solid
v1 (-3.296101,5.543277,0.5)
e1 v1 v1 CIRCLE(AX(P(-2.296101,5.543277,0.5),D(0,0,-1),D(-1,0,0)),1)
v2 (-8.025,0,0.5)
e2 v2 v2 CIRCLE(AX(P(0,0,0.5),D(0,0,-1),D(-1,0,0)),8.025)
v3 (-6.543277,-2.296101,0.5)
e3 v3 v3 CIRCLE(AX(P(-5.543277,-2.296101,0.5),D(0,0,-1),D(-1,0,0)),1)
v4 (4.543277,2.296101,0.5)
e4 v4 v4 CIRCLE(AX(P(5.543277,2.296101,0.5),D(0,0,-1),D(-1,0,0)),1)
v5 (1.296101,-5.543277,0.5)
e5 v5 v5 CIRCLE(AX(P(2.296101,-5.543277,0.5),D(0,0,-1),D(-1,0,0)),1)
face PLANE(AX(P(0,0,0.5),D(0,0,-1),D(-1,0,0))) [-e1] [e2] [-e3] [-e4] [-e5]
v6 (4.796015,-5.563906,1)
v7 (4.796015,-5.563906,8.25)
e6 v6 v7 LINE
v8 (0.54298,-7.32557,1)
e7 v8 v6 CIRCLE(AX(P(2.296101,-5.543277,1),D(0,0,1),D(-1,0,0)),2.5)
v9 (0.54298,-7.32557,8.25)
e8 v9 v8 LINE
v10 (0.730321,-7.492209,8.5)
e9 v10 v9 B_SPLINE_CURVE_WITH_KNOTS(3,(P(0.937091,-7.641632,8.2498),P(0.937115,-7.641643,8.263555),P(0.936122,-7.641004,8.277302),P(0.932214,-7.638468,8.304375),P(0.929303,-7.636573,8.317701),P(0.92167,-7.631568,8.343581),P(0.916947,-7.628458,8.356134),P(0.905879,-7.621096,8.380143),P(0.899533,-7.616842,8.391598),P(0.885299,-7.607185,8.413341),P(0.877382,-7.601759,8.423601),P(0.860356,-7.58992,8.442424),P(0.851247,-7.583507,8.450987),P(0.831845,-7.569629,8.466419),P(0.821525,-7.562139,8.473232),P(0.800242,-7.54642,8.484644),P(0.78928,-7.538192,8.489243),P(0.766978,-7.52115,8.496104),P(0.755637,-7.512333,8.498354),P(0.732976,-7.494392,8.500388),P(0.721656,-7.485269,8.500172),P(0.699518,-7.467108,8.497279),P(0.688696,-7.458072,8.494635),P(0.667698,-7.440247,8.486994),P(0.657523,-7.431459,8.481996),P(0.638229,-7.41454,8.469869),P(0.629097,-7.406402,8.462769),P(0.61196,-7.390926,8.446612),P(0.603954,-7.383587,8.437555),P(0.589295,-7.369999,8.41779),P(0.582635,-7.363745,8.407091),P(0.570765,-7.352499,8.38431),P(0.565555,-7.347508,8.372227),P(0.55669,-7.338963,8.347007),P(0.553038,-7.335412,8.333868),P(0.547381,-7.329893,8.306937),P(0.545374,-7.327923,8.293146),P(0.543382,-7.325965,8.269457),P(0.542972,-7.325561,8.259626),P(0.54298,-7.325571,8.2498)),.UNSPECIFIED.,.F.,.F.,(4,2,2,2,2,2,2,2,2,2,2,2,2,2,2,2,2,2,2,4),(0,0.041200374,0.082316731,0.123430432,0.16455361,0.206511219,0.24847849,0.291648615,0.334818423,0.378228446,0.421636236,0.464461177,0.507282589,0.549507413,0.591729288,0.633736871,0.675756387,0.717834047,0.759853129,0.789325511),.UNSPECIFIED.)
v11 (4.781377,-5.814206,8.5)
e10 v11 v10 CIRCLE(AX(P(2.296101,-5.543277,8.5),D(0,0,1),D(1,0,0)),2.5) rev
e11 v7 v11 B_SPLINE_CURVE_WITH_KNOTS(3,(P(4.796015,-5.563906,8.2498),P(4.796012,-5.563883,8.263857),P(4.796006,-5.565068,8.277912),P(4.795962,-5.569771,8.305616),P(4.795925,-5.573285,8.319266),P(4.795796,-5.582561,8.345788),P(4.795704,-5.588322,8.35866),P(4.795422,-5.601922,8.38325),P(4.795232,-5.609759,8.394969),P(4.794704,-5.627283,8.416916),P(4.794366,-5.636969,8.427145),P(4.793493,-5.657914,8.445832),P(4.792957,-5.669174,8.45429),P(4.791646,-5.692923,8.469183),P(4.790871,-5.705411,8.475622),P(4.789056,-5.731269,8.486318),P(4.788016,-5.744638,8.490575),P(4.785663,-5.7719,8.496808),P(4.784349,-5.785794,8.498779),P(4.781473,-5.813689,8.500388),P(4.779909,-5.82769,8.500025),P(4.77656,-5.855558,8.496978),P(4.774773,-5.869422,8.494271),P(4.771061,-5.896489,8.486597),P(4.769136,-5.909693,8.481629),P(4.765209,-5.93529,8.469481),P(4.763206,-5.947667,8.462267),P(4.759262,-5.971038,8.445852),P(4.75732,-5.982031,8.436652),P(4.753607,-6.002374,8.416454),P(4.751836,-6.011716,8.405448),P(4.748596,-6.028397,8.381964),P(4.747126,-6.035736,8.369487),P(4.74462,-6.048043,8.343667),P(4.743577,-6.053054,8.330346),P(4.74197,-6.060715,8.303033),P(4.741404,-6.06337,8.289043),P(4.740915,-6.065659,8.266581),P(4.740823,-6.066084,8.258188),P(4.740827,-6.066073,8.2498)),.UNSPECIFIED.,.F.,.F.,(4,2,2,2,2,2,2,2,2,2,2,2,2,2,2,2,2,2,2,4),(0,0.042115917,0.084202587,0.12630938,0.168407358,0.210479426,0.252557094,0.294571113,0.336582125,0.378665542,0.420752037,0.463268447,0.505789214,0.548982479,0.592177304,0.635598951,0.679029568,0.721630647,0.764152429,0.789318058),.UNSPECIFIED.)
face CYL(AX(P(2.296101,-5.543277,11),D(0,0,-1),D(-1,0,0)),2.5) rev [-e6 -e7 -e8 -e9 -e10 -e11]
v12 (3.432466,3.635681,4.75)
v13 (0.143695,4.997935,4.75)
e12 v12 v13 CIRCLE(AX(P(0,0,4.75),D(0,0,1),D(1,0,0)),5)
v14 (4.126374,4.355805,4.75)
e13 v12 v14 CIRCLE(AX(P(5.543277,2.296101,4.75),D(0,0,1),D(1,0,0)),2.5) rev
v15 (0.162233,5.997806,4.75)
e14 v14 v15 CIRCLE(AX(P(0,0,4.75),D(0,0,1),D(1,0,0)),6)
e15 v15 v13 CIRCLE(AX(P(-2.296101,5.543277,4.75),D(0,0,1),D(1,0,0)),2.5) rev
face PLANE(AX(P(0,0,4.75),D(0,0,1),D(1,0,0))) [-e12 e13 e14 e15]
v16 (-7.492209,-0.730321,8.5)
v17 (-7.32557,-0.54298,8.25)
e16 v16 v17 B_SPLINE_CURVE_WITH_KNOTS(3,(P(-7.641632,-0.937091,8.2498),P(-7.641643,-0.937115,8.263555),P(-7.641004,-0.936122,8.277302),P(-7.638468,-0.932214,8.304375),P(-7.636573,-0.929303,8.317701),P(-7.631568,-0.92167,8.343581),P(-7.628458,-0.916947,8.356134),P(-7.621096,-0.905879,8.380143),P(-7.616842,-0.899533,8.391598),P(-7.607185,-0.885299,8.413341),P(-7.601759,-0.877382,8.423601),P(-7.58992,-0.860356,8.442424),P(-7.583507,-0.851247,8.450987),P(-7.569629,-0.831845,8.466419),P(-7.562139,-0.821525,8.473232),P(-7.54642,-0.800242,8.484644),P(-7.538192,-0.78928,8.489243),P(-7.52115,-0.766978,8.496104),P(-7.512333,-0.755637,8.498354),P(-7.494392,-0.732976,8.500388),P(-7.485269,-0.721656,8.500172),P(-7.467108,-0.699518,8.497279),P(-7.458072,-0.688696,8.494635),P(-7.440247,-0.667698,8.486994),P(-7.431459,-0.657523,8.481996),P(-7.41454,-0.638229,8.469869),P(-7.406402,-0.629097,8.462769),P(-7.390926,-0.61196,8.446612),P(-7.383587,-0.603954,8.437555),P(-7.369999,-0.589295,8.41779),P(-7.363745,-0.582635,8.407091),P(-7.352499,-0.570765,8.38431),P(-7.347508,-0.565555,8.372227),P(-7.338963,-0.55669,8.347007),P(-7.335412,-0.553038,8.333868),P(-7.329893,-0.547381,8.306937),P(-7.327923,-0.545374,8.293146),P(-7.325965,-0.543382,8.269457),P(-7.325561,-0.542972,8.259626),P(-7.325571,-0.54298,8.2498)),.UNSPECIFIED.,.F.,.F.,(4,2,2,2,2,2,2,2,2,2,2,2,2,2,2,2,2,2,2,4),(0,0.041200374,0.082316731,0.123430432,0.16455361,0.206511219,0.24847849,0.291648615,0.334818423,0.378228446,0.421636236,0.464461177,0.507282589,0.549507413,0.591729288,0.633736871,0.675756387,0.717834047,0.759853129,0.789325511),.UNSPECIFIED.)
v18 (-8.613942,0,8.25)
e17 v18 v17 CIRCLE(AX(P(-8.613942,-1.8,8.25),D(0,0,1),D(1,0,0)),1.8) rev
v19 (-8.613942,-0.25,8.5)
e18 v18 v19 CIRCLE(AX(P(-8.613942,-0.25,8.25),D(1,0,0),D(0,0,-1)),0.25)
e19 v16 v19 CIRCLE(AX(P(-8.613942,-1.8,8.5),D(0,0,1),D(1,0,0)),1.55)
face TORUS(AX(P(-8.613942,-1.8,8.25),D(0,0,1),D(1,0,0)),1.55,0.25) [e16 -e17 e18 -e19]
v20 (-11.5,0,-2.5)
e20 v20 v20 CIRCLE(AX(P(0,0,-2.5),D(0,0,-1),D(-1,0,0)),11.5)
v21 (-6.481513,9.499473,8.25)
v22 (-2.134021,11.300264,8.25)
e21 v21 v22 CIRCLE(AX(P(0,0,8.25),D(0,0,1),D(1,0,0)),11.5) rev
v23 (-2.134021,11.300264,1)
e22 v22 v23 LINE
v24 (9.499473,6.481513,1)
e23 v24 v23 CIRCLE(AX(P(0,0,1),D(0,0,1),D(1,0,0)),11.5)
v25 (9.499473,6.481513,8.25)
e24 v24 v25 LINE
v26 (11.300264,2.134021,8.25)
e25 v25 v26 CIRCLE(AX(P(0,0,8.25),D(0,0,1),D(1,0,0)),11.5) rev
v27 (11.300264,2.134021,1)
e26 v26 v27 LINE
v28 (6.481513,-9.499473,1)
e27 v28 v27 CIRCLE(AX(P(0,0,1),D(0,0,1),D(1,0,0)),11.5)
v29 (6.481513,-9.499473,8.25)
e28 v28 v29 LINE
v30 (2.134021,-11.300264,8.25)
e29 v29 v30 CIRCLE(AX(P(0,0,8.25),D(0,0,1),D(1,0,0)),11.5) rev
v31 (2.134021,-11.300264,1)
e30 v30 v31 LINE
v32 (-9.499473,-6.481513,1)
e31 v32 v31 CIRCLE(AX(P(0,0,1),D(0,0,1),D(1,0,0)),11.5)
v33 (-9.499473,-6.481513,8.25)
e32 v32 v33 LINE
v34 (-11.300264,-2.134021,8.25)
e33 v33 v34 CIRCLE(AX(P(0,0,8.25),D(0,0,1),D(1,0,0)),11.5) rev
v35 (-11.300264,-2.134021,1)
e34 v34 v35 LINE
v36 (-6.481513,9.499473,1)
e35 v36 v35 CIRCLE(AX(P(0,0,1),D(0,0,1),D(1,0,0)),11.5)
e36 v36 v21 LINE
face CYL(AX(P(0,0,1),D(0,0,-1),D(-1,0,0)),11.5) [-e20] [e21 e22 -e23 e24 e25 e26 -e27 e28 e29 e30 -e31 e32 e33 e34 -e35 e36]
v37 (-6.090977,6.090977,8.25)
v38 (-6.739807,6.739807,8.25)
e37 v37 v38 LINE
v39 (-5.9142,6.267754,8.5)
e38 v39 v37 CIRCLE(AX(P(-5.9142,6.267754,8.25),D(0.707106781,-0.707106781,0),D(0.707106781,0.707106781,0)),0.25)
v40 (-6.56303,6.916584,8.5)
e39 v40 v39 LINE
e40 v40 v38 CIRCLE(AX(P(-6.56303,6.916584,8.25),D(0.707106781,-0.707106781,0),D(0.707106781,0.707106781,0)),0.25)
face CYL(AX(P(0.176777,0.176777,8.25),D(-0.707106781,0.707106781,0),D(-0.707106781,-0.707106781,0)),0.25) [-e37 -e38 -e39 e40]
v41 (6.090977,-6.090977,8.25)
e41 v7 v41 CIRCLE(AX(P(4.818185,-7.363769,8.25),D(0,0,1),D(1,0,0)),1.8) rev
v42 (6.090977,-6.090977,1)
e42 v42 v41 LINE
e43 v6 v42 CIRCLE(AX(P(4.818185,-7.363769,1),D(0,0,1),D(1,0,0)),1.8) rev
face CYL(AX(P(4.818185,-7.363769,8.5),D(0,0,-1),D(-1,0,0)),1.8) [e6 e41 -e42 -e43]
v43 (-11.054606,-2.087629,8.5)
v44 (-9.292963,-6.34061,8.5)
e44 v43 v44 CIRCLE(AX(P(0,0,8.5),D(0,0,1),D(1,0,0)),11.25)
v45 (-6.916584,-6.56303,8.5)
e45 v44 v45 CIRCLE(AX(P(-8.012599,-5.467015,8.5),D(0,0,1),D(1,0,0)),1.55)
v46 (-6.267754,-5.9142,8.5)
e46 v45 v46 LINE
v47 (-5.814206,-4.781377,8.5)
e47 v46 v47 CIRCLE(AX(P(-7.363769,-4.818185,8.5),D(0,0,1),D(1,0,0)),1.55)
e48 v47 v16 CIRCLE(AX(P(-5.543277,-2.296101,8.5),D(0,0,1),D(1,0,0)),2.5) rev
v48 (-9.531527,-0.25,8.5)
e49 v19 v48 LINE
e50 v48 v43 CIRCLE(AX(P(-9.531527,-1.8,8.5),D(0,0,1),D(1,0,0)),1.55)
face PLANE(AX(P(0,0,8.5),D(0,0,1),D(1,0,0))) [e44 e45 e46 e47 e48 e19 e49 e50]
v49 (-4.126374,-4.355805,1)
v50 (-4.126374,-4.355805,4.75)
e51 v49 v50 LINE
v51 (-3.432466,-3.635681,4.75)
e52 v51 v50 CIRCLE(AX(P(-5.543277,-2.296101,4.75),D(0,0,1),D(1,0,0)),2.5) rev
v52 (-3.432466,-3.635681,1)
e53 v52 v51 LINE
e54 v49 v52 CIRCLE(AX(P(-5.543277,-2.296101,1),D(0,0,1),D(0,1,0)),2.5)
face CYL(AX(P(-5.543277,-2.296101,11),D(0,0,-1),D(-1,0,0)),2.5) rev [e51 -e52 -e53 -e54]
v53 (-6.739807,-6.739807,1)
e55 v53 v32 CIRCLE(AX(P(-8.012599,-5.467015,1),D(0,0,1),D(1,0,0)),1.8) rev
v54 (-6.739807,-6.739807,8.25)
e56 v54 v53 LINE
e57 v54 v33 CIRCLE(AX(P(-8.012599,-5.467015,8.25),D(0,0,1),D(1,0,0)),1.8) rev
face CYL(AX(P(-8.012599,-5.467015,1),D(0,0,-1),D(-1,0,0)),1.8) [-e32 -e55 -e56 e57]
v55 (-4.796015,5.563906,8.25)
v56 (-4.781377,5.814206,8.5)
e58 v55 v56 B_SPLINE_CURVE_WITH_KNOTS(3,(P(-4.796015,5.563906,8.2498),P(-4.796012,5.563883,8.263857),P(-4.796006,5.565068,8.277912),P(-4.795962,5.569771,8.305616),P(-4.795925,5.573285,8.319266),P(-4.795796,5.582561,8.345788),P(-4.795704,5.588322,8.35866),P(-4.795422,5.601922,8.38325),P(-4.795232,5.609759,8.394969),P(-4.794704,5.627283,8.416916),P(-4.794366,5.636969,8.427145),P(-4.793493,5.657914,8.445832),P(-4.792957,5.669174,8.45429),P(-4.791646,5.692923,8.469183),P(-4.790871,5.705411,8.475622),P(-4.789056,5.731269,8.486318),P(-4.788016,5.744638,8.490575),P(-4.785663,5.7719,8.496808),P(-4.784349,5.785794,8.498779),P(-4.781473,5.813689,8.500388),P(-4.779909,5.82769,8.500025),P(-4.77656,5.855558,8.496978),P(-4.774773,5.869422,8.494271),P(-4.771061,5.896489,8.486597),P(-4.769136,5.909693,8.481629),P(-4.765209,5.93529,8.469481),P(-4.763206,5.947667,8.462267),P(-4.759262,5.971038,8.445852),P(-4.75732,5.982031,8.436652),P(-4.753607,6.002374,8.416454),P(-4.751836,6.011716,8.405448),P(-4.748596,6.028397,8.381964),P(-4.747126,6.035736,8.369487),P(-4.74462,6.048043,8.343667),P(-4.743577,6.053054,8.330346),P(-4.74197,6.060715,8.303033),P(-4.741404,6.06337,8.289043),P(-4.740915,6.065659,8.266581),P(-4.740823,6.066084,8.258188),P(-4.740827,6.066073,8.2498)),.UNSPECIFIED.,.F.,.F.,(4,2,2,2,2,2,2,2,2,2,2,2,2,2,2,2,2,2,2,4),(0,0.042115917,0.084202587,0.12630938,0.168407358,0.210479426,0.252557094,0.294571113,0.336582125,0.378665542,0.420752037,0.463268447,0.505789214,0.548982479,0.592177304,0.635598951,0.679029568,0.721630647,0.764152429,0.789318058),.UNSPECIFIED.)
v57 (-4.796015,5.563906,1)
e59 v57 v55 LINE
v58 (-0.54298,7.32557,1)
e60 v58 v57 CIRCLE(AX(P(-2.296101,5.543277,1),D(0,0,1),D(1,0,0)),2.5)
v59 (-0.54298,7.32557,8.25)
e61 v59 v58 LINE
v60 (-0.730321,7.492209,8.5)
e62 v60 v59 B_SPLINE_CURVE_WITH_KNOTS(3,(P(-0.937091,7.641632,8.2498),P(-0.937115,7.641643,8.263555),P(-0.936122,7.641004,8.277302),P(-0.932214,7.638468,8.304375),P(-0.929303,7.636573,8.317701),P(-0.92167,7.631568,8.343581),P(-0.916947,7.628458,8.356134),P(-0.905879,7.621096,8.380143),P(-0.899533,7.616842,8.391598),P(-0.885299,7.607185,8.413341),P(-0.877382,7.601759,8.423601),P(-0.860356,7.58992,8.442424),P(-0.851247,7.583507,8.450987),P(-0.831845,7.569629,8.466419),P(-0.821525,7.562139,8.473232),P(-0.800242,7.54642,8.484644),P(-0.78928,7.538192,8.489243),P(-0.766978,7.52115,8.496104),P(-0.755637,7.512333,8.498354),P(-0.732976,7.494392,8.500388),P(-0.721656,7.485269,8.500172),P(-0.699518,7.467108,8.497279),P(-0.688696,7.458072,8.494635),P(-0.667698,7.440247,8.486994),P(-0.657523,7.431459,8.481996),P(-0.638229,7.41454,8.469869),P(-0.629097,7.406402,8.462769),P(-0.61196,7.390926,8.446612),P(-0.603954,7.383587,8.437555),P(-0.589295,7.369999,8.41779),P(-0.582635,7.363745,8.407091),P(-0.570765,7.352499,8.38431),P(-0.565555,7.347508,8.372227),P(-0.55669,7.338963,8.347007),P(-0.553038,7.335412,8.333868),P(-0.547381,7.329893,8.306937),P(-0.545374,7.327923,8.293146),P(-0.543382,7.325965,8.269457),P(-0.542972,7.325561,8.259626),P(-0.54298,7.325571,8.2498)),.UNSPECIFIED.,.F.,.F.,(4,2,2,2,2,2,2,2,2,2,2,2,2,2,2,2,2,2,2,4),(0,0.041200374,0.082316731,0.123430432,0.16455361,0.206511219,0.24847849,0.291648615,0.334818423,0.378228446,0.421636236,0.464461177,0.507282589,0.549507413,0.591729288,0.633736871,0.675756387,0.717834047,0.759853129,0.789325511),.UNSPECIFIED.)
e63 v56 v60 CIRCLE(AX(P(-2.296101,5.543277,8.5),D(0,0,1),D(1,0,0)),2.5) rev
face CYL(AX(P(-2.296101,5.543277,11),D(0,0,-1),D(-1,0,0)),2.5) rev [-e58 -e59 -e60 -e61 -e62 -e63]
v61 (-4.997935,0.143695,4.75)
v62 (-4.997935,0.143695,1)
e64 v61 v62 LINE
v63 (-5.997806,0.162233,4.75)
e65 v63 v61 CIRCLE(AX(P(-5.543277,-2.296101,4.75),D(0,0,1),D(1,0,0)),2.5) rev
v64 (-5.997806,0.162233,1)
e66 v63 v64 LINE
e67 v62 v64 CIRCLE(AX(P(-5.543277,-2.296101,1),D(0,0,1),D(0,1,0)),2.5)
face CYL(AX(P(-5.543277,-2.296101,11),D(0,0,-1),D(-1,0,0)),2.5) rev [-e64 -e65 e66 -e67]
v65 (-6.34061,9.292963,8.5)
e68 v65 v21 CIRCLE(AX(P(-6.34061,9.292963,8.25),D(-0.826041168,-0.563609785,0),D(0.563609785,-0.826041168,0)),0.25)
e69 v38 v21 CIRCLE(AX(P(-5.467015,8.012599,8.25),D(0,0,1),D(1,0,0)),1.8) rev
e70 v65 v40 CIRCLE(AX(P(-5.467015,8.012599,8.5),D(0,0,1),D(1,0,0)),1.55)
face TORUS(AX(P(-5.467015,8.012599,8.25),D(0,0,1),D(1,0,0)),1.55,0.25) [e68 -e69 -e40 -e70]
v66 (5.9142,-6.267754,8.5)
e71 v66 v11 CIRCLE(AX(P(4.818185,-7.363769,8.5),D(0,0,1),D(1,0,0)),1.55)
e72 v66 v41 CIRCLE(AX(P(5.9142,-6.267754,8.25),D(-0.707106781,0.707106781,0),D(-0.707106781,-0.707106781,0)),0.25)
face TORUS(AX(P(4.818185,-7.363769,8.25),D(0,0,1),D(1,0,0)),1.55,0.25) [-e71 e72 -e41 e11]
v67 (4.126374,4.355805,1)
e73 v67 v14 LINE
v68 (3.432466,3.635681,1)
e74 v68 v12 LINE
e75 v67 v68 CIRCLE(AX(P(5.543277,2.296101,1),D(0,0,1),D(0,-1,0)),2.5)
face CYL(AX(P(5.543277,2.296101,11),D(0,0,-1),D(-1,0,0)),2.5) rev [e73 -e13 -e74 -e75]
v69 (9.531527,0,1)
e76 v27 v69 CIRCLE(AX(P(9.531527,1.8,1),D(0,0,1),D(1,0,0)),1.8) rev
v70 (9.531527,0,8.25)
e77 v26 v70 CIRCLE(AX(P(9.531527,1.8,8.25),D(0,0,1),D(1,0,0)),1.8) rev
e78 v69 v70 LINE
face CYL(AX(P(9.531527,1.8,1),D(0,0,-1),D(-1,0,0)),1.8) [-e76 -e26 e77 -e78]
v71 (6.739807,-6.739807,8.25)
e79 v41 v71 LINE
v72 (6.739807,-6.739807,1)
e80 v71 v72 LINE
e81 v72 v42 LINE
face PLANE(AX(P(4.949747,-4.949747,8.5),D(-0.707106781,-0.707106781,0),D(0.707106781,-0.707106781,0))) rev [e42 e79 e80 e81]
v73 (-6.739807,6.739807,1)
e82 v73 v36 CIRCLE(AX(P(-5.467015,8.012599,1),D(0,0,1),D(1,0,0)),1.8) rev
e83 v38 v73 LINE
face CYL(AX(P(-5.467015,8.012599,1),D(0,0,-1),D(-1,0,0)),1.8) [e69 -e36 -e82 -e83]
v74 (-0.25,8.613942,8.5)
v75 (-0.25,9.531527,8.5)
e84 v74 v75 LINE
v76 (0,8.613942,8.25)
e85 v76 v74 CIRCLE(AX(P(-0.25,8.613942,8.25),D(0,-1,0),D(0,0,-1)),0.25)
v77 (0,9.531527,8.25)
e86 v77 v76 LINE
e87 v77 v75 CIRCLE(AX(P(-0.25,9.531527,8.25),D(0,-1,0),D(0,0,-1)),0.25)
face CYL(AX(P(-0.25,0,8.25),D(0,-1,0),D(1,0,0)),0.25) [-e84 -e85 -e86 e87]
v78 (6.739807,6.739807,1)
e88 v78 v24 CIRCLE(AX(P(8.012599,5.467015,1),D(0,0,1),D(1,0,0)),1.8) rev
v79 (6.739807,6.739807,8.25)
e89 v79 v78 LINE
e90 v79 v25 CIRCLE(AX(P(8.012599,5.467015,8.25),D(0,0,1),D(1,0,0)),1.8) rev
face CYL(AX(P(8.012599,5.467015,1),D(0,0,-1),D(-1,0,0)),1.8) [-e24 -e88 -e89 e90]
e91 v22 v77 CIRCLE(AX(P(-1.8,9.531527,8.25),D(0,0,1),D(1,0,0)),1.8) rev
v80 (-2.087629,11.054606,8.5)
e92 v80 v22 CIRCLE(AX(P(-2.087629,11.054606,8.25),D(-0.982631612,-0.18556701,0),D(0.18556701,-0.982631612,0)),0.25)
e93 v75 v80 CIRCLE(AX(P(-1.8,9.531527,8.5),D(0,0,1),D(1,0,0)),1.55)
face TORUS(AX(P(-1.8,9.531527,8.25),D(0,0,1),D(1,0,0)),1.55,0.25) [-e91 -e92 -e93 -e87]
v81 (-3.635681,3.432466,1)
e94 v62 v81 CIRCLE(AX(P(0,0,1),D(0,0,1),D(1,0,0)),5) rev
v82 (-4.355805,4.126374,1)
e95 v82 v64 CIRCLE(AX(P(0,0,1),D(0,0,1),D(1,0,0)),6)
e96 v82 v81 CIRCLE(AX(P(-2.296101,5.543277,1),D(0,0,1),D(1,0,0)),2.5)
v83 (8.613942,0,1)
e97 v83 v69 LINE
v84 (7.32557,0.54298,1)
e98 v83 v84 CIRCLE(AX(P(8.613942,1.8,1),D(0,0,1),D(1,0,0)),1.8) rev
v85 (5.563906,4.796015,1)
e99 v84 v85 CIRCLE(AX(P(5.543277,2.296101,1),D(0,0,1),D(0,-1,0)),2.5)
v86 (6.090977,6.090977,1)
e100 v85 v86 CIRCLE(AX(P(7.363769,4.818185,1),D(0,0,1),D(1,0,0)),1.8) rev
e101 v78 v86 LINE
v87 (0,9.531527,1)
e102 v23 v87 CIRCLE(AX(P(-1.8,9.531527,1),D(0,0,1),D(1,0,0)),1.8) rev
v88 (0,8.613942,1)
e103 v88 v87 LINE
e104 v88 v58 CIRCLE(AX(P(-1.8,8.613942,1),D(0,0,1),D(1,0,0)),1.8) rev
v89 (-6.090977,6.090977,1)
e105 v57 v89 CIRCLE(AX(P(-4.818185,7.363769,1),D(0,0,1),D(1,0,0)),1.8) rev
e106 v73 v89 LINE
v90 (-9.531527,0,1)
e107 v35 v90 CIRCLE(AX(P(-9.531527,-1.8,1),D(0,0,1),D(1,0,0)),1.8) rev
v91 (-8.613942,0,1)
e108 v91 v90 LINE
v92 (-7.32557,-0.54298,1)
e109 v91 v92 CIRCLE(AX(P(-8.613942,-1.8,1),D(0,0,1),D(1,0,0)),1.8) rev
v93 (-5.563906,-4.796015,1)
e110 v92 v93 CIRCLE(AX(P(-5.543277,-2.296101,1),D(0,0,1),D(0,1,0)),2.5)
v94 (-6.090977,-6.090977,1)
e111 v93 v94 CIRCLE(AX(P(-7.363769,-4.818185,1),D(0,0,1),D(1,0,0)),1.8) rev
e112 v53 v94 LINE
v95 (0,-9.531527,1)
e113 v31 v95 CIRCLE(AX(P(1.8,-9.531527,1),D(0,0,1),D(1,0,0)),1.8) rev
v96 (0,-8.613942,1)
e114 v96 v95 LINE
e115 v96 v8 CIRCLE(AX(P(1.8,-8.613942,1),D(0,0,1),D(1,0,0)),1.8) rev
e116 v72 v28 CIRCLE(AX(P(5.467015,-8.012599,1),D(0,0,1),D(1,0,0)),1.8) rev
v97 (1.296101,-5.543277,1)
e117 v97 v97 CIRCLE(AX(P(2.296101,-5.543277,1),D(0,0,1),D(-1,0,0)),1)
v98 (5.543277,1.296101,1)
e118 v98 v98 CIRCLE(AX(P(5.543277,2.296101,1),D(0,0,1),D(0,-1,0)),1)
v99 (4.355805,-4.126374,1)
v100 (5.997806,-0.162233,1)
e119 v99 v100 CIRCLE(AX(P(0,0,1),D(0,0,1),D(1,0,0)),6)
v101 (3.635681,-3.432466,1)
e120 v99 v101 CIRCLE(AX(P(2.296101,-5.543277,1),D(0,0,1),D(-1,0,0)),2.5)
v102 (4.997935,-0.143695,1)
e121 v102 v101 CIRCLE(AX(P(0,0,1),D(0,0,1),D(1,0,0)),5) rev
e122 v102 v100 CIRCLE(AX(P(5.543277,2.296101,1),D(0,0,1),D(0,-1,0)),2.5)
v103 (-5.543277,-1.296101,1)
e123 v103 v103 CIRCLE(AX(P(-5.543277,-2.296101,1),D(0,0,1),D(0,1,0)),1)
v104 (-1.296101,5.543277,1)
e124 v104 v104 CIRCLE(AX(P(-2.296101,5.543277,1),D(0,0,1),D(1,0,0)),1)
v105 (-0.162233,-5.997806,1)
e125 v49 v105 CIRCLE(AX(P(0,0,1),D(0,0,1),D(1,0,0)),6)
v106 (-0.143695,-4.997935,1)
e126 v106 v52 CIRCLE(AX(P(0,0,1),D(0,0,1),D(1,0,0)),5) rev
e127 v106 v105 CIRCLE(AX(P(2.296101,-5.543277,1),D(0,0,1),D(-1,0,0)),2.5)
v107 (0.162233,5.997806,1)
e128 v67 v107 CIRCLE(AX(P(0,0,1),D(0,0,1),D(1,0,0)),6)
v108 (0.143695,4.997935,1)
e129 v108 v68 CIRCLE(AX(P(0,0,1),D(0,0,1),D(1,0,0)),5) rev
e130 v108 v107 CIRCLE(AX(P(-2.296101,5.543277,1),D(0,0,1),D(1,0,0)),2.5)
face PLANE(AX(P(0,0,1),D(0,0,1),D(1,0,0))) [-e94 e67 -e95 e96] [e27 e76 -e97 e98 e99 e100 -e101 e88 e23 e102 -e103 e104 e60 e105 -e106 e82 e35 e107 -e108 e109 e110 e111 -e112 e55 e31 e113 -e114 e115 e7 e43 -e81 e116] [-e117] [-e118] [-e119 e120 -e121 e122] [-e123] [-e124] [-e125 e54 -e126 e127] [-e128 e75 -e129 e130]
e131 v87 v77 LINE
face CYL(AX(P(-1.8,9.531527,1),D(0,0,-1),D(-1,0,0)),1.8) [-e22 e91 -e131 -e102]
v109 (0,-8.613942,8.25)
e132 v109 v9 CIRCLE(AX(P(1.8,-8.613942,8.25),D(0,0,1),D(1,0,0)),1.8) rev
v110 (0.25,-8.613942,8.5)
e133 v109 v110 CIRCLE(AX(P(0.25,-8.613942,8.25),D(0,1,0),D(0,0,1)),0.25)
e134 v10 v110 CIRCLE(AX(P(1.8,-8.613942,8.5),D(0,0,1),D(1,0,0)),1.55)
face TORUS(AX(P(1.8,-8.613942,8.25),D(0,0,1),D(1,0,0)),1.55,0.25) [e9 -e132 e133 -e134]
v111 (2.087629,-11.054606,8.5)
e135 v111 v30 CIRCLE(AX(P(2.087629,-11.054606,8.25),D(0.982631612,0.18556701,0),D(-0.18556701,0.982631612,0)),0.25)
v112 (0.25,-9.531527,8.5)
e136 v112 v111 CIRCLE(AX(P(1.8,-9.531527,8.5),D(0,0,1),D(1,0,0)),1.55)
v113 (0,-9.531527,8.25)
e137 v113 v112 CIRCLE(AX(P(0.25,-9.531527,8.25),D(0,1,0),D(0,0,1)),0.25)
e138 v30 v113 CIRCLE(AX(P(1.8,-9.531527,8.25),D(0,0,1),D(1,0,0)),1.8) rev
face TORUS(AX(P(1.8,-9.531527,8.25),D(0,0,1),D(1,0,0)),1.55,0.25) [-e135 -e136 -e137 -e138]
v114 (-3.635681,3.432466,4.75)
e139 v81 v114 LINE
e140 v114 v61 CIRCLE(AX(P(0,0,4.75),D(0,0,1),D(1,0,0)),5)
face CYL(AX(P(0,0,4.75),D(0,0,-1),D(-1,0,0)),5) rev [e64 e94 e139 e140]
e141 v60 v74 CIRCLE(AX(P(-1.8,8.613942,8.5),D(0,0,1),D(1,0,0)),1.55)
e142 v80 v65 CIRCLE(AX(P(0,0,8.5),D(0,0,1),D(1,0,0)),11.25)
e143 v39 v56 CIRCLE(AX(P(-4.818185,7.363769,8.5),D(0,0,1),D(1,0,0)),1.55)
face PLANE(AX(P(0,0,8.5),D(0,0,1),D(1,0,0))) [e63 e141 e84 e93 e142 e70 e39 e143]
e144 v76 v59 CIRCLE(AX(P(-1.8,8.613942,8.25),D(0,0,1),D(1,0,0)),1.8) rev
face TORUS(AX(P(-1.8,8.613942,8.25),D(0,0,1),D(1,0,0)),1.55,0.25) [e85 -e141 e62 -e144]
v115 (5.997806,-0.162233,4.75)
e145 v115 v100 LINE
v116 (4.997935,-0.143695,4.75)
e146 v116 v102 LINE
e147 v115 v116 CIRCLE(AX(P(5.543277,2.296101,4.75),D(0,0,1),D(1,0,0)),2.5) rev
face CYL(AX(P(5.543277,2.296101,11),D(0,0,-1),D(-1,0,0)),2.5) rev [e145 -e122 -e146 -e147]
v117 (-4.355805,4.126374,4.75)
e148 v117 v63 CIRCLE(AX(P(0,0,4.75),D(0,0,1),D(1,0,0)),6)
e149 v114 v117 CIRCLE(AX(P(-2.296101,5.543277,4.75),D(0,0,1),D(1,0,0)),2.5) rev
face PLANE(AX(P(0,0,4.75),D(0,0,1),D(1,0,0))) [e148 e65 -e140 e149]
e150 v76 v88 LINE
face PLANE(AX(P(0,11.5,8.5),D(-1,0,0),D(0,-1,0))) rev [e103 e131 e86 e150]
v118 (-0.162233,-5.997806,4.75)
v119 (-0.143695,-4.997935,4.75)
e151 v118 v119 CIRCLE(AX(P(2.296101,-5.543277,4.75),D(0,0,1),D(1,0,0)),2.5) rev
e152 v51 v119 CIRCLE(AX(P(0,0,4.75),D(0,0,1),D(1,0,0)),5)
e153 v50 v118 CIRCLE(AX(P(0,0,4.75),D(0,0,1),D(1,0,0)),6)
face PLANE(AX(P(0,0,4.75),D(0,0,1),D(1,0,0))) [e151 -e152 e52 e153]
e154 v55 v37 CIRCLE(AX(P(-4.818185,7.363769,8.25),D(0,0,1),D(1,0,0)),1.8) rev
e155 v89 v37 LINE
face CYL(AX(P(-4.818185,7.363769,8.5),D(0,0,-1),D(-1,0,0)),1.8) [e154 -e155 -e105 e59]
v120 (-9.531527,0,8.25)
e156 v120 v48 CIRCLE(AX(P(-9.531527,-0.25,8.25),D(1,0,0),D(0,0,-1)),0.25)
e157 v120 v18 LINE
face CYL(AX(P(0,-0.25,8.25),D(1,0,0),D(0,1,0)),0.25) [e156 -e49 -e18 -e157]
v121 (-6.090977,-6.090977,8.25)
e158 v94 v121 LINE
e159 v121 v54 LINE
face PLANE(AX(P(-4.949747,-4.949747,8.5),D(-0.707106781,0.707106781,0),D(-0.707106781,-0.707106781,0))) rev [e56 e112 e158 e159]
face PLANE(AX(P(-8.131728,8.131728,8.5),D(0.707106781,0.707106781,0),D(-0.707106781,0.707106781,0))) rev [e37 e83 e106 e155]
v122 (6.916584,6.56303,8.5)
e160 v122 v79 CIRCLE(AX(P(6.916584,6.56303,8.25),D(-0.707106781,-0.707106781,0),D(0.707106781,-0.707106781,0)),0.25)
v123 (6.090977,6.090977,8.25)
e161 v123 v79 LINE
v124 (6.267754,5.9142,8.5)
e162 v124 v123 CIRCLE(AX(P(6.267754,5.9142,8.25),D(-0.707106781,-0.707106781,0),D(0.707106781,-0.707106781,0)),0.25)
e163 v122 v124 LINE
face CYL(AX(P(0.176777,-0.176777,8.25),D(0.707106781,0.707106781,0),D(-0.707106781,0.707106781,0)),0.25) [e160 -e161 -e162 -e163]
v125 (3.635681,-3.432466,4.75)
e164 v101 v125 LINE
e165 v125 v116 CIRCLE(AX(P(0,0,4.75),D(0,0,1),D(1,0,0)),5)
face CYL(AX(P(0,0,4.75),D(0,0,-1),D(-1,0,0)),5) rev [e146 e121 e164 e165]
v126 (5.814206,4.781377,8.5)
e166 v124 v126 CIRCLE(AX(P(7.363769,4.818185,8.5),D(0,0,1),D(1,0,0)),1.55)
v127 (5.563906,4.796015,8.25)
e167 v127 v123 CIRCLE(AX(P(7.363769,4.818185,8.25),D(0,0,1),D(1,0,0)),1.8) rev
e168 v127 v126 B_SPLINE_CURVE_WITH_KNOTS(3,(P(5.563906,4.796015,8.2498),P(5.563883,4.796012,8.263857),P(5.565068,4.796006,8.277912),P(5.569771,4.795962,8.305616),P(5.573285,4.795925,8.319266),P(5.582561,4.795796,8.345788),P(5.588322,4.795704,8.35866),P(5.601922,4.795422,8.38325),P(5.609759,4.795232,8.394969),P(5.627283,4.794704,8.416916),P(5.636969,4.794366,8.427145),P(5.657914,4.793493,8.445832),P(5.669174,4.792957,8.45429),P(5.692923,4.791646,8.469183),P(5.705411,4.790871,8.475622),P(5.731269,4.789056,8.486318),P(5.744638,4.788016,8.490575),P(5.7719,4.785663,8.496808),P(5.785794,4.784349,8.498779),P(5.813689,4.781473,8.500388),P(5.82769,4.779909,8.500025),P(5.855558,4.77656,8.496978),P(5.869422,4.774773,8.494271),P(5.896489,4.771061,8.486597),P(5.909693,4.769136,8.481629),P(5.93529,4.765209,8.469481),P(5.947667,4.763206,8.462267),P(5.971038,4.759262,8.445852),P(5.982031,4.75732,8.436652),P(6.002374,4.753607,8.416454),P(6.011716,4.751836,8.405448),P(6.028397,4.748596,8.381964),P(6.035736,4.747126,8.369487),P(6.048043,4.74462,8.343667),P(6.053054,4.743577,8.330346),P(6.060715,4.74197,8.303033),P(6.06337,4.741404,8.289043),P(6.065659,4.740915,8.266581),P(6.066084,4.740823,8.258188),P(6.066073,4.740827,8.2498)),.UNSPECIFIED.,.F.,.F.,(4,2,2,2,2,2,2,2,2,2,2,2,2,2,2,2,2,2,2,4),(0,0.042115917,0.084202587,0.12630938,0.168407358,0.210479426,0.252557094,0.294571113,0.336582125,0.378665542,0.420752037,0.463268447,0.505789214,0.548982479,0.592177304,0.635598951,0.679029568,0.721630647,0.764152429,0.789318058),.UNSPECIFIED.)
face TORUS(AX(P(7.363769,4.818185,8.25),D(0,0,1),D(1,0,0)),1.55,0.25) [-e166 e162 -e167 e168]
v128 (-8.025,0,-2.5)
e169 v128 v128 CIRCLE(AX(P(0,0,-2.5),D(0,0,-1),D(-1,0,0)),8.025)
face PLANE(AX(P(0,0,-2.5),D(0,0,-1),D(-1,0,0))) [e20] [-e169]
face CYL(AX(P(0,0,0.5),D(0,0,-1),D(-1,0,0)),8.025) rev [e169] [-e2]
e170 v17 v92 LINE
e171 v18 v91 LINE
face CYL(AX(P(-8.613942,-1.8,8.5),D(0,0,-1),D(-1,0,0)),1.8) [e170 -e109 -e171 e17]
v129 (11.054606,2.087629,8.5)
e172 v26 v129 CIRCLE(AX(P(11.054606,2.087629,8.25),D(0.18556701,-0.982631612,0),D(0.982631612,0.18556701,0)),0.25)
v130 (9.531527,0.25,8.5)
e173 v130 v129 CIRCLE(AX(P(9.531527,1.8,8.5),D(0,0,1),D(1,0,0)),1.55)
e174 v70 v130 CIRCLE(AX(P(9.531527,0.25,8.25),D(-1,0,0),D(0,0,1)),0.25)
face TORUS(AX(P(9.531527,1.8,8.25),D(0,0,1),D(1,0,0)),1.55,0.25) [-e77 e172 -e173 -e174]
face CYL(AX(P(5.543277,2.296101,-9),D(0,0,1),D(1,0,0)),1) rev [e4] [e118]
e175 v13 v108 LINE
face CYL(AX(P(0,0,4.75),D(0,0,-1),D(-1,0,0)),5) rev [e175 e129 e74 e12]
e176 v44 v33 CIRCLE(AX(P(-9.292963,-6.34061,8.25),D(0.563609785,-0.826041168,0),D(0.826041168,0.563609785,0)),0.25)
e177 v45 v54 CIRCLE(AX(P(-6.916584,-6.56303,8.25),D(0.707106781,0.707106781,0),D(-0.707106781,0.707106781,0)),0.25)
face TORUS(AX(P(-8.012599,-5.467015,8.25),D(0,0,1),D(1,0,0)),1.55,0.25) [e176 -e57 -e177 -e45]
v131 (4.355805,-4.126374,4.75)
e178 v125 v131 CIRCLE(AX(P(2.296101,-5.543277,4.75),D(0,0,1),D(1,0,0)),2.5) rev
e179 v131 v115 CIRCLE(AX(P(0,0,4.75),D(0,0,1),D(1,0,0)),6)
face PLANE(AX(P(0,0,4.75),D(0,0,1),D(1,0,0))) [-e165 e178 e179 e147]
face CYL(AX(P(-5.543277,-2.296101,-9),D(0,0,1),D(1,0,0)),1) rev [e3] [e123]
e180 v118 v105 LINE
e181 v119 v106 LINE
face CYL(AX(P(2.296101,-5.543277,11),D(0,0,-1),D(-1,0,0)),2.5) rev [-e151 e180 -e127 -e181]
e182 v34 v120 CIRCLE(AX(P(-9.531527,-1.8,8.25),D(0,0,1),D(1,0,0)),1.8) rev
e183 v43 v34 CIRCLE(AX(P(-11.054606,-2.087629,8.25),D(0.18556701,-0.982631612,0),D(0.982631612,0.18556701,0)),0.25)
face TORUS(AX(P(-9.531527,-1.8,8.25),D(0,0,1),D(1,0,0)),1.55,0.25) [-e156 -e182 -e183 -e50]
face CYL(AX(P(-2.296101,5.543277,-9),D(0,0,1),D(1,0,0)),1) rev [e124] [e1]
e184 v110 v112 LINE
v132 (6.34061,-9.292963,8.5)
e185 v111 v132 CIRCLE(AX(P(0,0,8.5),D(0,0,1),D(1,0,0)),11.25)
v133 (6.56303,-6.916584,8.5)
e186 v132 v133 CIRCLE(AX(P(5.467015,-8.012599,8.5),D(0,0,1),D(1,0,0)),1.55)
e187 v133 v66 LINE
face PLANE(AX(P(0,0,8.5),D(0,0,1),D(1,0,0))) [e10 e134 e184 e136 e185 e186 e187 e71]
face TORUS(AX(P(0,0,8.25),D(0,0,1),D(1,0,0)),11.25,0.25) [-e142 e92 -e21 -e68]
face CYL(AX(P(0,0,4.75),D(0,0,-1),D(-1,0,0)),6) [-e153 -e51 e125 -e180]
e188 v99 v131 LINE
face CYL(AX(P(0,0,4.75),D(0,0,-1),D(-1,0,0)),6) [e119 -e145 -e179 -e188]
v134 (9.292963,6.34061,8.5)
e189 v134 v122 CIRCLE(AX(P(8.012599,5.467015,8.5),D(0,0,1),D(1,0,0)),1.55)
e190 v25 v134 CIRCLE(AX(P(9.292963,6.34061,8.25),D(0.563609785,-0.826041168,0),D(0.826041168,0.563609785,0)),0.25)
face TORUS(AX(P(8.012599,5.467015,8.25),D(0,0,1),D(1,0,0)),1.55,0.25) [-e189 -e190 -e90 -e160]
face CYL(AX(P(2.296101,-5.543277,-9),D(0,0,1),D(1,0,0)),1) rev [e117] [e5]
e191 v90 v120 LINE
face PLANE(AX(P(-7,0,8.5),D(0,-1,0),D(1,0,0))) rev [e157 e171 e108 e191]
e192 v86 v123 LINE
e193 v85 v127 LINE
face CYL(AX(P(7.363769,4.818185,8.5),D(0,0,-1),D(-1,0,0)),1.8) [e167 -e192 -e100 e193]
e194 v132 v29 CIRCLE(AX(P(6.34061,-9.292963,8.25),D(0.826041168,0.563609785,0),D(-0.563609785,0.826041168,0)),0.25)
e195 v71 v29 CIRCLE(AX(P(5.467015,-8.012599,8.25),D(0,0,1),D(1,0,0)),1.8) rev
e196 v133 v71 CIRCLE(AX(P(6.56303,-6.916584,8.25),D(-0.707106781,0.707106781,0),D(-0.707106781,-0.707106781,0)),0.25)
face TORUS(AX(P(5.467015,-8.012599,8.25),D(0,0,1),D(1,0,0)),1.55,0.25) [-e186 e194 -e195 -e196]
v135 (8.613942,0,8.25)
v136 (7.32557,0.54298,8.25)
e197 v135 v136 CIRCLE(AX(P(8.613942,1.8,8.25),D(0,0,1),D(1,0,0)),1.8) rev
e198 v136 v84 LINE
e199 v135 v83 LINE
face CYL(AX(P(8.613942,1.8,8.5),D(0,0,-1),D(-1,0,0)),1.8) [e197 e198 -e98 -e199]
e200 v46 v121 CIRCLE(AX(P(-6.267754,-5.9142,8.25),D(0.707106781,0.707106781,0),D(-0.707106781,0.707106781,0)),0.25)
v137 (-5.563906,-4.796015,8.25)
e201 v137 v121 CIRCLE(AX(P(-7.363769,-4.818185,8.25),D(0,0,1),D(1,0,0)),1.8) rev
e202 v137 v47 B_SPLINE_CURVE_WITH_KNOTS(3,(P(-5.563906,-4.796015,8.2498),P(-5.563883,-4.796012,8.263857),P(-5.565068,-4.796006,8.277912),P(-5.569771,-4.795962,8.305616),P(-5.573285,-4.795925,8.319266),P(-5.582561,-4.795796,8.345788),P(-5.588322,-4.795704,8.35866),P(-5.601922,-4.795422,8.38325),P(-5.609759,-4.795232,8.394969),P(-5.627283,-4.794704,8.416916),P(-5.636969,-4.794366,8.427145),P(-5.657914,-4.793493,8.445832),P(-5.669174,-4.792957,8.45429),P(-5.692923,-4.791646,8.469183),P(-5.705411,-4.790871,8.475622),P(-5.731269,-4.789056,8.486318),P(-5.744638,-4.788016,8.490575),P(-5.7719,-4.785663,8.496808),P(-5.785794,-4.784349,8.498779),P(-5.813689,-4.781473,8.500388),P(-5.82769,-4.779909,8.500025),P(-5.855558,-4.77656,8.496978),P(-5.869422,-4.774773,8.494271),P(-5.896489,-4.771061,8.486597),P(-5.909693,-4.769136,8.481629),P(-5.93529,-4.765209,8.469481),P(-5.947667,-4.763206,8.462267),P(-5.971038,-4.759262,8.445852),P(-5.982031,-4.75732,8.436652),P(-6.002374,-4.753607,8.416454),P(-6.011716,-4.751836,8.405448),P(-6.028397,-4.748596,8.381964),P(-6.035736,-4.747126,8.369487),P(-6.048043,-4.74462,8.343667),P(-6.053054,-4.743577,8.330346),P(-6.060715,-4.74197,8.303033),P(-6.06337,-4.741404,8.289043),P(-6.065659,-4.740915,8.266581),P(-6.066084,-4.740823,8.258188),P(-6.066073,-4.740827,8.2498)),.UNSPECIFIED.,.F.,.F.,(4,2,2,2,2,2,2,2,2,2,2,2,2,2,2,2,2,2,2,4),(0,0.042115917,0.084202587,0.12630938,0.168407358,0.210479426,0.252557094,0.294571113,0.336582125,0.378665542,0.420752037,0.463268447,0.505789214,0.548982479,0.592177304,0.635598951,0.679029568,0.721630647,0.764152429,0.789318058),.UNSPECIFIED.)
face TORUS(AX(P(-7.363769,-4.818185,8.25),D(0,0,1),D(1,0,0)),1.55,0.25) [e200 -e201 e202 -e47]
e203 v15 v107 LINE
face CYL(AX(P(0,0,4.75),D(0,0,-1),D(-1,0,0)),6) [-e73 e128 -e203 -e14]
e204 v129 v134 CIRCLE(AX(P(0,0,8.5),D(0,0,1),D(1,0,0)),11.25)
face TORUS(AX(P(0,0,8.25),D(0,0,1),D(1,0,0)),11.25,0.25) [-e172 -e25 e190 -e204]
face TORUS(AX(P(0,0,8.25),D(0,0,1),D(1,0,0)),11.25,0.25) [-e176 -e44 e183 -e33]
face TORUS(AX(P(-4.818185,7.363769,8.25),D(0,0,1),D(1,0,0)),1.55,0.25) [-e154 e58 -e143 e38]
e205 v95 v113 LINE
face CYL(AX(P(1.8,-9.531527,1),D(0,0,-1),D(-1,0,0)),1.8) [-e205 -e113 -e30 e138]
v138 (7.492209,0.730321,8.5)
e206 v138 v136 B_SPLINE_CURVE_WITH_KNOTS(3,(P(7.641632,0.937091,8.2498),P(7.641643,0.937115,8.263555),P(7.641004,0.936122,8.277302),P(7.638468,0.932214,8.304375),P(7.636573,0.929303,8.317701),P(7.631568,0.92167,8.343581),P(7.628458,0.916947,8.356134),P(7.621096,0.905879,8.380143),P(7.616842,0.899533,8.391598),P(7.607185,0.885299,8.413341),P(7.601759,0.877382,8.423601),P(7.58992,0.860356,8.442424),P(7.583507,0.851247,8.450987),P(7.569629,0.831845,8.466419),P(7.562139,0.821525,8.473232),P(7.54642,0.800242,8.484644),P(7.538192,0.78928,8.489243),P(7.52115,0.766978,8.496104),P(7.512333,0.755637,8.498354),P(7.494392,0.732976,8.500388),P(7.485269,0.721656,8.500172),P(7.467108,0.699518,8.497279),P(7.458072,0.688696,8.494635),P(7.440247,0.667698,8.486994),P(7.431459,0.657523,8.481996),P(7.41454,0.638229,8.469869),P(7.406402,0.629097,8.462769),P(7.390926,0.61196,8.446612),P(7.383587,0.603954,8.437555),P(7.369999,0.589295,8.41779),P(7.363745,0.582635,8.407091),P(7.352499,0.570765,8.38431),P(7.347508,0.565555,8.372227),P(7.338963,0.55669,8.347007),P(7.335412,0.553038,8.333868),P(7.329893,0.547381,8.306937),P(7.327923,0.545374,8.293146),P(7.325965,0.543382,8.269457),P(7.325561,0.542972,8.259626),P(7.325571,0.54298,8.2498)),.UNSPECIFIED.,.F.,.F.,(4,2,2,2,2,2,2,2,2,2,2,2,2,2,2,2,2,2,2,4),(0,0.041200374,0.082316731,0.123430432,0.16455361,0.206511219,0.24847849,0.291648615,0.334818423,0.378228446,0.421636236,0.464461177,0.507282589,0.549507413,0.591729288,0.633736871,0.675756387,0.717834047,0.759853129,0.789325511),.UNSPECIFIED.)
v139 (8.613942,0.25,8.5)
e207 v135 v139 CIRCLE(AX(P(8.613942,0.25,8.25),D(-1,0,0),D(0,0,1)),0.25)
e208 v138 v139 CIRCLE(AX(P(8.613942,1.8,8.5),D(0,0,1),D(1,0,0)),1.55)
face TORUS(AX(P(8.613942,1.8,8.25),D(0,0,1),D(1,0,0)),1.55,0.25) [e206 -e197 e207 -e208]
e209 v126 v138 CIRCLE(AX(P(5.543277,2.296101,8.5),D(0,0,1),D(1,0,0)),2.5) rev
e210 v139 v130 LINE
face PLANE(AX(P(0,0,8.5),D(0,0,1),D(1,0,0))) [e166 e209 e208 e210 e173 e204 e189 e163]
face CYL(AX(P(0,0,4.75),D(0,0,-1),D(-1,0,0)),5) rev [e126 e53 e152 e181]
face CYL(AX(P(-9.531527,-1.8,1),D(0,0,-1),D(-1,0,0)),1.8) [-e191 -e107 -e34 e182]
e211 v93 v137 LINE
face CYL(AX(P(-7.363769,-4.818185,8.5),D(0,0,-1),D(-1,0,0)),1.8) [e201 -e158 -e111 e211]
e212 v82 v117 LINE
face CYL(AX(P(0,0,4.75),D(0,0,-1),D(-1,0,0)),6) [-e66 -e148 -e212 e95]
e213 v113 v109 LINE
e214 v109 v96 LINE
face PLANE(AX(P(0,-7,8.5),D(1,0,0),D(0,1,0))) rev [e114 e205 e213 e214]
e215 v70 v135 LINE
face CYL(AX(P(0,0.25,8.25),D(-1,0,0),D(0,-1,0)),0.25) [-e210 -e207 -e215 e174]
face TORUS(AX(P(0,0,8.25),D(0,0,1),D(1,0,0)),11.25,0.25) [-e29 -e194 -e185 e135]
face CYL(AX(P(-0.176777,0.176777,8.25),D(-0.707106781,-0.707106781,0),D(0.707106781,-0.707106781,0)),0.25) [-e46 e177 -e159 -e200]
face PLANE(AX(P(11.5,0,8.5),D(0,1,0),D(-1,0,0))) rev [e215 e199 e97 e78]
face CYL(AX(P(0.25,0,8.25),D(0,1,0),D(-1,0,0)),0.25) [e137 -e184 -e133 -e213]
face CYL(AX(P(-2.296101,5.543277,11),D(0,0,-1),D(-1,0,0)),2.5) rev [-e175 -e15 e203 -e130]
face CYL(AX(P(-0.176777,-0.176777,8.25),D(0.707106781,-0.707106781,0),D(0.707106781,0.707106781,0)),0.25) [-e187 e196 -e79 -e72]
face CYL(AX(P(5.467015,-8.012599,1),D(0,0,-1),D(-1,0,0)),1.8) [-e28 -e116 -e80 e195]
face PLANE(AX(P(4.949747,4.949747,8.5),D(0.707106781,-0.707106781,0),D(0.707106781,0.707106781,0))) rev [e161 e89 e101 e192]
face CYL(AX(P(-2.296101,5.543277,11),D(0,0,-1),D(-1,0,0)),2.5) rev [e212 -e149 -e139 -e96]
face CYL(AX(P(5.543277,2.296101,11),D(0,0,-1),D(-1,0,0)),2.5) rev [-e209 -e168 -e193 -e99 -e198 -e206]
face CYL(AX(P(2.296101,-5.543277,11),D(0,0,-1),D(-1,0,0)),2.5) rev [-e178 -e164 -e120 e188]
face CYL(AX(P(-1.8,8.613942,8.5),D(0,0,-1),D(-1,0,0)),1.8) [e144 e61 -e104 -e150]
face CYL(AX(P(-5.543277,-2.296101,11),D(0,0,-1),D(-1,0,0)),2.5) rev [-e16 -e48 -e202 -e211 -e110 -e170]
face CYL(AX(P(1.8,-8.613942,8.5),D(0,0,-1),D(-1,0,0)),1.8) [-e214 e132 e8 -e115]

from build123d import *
from build123d.topology import SkipClean

# Parameters (mm, degrees)
SKETCH1_R           = 11.5
BOSS_EXTRUDE1_DEPTH = 1
BOSS_EXTRUDE2_DEPTH = 7.5
BOSS_EXTRUDE4_START = 2.5
SKETCH9_R           = 11.5
BOSS_EXTRUDE4_DEPTH = 2.5
FILLET7_R           = 1.8
SKETCH15_R          = 8.025
CUT_EXTRUDE7_DEPTH  = 3
SKETCH17_R          = 6
SKETCH17_R_2        = 5
BOSS_EXTRUDE7_DEPTH = 3.75
FILLET8_R           = 0.25
SKETCH21_R          = 2.5000000000000004
CUT_EXTRUDE9_DEPTH  = 10
SKETCH22_R          = 1.0000000000000002
CUT_EXTRUDE10_DEPTH = 10
CIRPATTERN5_COUNT   = 4
CIRPATTERN6_COUNT   = 4


with BuildPart() as part:
    # Sketch1 → Boss-Extrude1 (new body)
    with BuildSketch(Plane.XY):
        Circle(SKETCH1_R)
    extrude(amount=BOSS_EXTRUDE1_DEPTH)

    # Sketch3 → Boss-Extrude2 (add)
    with SkipClean():  # the faces are left unmerged after this step: merging them gives an invalid solid
        with BuildSketch(Plane.XY.offset(1)):
            with BuildLine():
                Line((2.94e-15, 11.5), (2.39e-15, 7))
                ThreePointArc((2.39e-15, 7), (-2.678784026555645, 6.467156727579), (-4.94974746830586, 4.949747468305805))
                Line((-4.94974746830586, 4.949747468305805), (-8.131727983645343, 8.13172798364525))
                ThreePointArc((-8.131727983645343, 8.13172798364525), (-4.40085947219856, 10.624614623879786), (2.94e-15, 11.5))
            make_face()
            with BuildLine():
                Line((11.5, -2.94e-15), (7, -2.39e-15))
                ThreePointArc((7, -2.39e-15), (6.467156727578999, 2.678784026555647), (4.949747468305803, 4.949747468305863))
                Line((4.949747468305803, 4.949747468305863), (8.131727983645245, 8.131727983645348))
                ThreePointArc((8.131727983645245, 8.131727983645348), (10.624614623879785, 4.400859472198563), (11.5, -2.94e-15))
            make_face()
            with BuildLine():
                Line((-4.949747468305786, -4.94974746830588), (-8.13172798364522, -8.131727983645371))
                ThreePointArc((-8.13172798364522, -8.131727983645371), (-10.624614623879776, -4.400859472198586), (-11.5, -2.94e-15))
                Line((-11.5, -2.94e-15), (-7, -2.39e-15))
                ThreePointArc((-7, -2.39e-15), (-6.467156727578994, -2.6787840265556606), (-4.949747468305786, -4.94974746830588))
            make_face()
            with BuildLine():
                Line((2.39e-15, -7), (2.94e-15, -11.5))
                ThreePointArc((2.94e-15, -11.5), (4.4008594721985705, -10.624614623879783), (8.13172798364535, -8.131727983645241))
                Line((8.13172798364535, -8.131727983645241), (4.949747468305866, -4.949747468305799))
                ThreePointArc((4.949747468305866, -4.949747468305799), (2.6787840265556517, -6.467156727578998), (2.39e-15, -7))
            make_face()
        extrude(amount=BOSS_EXTRUDE2_DEPTH)

    # Sketch9 → Boss-Extrude4 (add)
    with SkipClean():  # the faces are left unmerged after this step: merging them gives an invalid solid
        with BuildSketch(Plane(origin=(0, 0, 0), x_dir=(-1, 0, 0), z_dir=(0, 0, -1)).offset(BOSS_EXTRUDE4_START)):
            Circle(SKETCH9_R)
        extrude(amount=-BOSS_EXTRUDE4_DEPTH)

    # Fillet7
    # the kernel refuses this fillet: 1.8 mm, written as the material it takes off along each edge
    with BuildSketch(Plane(origin=(-11.5, -3.47e-15, 1), x_dir=(0.09318902325471962, -0.9956484349130628, 0), z_dir=(0, 0, 1))) as fillet7_piece_1:
        with BuildLine():
            CenterArc((1.9756072930000665, 1.7921671828435137), FILLET7_R, 174.6529039393069, 100.69419212138632)
            Line((0.18344011015655334, 1.9599074247020072), (0, 0))
            ThreePointArc((0, 0), (1.0716737674292827, -0.05004299849978115), (2.1433475348585644, 0))
        make_face()
    extrude(amount=12.858368837146411, mode=Mode.SUBTRACT)
    with BuildSketch(Plane(origin=(-8.13172798364522, -8.131727983645371, 1), x_dir=(-0.6381351697292437, 0.7699243502803567, 0), z_dir=(0, 0, 1))) as fillet7_piece_2:
        with BuildLine():
            CenterArc((1.9756072930000672, -1.792167182843513), FILLET7_R, 84.6529039393068, 100.69419212138638)
            Line((0.1834401101565546, -1.9599074247020083), (0, 0))
            ThreePointArc((0, 0), (1.0716737674292829, 0.05004299849977712), (2.143347534858564, -1.7e-16))
        make_face()
    extrude(amount=12.85836883714641, mode=Mode.SUBTRACT)
    with BuildSketch(Plane(origin=(-4.9497474683057865, -4.94974746830588, 1), x_dir=(-0.7071067811865409, -0.7071067811865541, 0), z_dir=(0, 0, 1))) as fillet7_piece_3:
        with BuildLine():
            CenterArc((1.6139421869432105, -1.8), FILLET7_R, 89.99999999999999, 78.1971083096929)
            ThreePointArc((-0.1480005331133559, -1.4318181818181808), (-0.03709844001056889, -0.7197234648785187), (0, 0))
            Line((0, 0), (1.613942186943211, -5e-17))
        make_face()
    extrude(amount=11.534855467358028, mode=Mode.SUBTRACT)
    with BuildSketch(Plane(origin=(-7, -2.39e-15, 1), x_dir=(0.10281763783979006, -0.9947002228556329, 0), z_dir=(0, 0, 1))) as fillet7_piece_4:
        with BuildLine():
            CenterArc((1.6245186778686538, -1.7904604011401397), FILLET7_R, 95.90144584515348, 78.19710830969298)
            Line((-0.1659417232714857, -1.605388653028521), (0, 0))
            ThreePointArc((0, 0), (0.719723464878518, -0.0370984400105693), (1.4394469297570365, -1e-17))
        make_face()
    extrude(amount=11.53485546735803, mode=Mode.SUBTRACT)
    with BuildSketch(Plane(origin=(11.5, -1.91e-15, 1), x_dir=(-0.09318902325471963, 0.9956484349130628, 0), z_dir=(0, 0, 1))) as fillet7_piece_5:
        with BuildLine():
            CenterArc((1.9756072930000679, 1.7921671828435135), FILLET7_R, 174.65290393930684, 100.69419212138632)
            Line((0.1834401101565547, 1.959907424702009), (0, 0))
            ThreePointArc((0, 0), (1.071673767429282, -0.05004299849977752), (2.143347534858564, 1e-17))
        make_face()
    extrude(amount=12.85836883714641, mode=Mode.SUBTRACT)
    with BuildSketch(Plane(origin=(8.131727983645245, 8.131727983645348, 1), x_dir=(0.6381351697292414, -0.7699243502803585, 0), z_dir=(0, 0, 1))) as fillet7_piece_6:
        with BuildLine():
            CenterArc((1.9756072930000685, -1.7921671828435133), FILLET7_R, 84.65290393930678, 100.69419212138632)
            Line((0.18344011015655537, -1.9599074247020083), (0, 0))
            ThreePointArc((0, 0), (1.0716737674292818, 0.05004299849977642), (2.1433475348585658, 1e-16))
        make_face()
    extrude(amount=12.858368837146415, mode=Mode.SUBTRACT)
    with BuildSketch(Plane(origin=(4.949747468305803, 4.949747468305864, 1), x_dir=(0.7071067811865431, 0.7071067811865519, 0), z_dir=(0, 0, 1))) as fillet7_piece_7:
        with BuildLine():
            CenterArc((1.6139421869432122, -1.8000000000000003), FILLET7_R, 90.00000000000006, 78.19710830969285)
            ThreePointArc((-0.1480005331133539, -1.4318181818181812), (-0.03709844001056789, -0.7197234648785188), (0, 0))
            Line((0, 0), (1.6139421869432107, 9e-17))
        make_face()
    extrude(amount=11.534855467358028, mode=Mode.SUBTRACT)
    with BuildSketch(Plane(origin=(7.000000000000001, -2.39e-15, 1), x_dir=(-0.10281763783978815, 0.9947002228556331, 0), z_dir=(0, 0, 1))) as fillet7_piece_8:
        with BuildLine():
            CenterArc((1.6245186778686564, -1.7904604011401393), FILLET7_R, 95.90144584515355, 78.19710830969294)
            Line((-0.1659417232714833, -1.6053886530285206), (0, 0))
            ThreePointArc((0, 0), (0.7197234648785186, -0.03709844001056886), (1.4394469297570374, 1e-17))
        make_face()
    extrude(amount=11.53485546735803, mode=Mode.SUBTRACT)
    with BuildSketch(Plane(origin=(2.94e-15, -11.5, 1), x_dir=(0.9956484349130625, 0.09318902325472045, 0), z_dir=(0, 0, 1))) as fillet7_piece_9:
        with BuildLine():
            CenterArc((1.9756072930000688, 1.7921671828435133), FILLET7_R, 174.65290393930678, 100.69419212138638)
            Line((0.18344011015655606, 1.9599074247020103), (0, 0))
            ThreePointArc((0, 0), (1.0716737674292822, -0.05004299849977666), (2.143347534858564, -3e-17))
        make_face()
    extrude(amount=12.858368837146411, mode=Mode.SUBTRACT)
    with BuildSketch(Plane(origin=(8.131727983645348, -8.131727983645241, 1), x_dir=(-0.7699243502803581, -0.6381351697292419, 0), z_dir=(0, 0, 1))) as fillet7_piece_10:
        with BuildLine():
            CenterArc((1.9756072930000643, -1.7921671828435122), FILLET7_R, 84.65290393930678, 100.69419212138632)
            Line((0.1834401101565515, -1.9599074247020072), (0, 0))
            ThreePointArc((0, 0), (1.0716737674292809, 0.05004299849977881), (2.1433475348585613, 1.5e-16))
        make_face()
    extrude(amount=12.858368837146404, mode=Mode.SUBTRACT)
    with BuildSketch(Plane(origin=(4.949747468305867, -4.9497474683058, 1), x_dir=(0.7071067811865519, -0.7071067811865431, 0), z_dir=(0, 0, 1))) as fillet7_piece_11:
        with BuildLine():
            CenterArc((1.6139421869432136, -1.8), FILLET7_R, 90.00000000000001, 78.19710830969295)
            ThreePointArc((-0.1480005331133532, -1.4318181818181832), (-0.03709844001056726, -0.7197234648785195), (0, 0))
            Line((0, 0), (1.6139421869432133, 3e-17))
        make_face()
    extrude(amount=11.534855467358033, mode=Mode.SUBTRACT)
    with BuildSketch(Plane(origin=(2.69e-15, -7.000000000000001, 1), x_dir=(0.9947002228556331, 0.1028176378397881, 0), z_dir=(0, 0, 1))) as fillet7_piece_12:
        with BuildLine():
            CenterArc((1.624518677868658, -1.7904604011401393), FILLET7_R, 95.90144584515357, 78.19710830969288)
            Line((-0.16594172327148143, -1.6053886530285206), (0, 0))
            ThreePointArc((0, 0), (0.7197234648785191, -0.03709844001056889), (1.439446929757038, -1e-17))
        make_face()
    extrude(amount=11.53485546735803, mode=Mode.SUBTRACT)
    with BuildSketch(Plane(origin=(3.47e-15, 11.5, 1), x_dir=(-0.9956484349130628, -0.09318902325471957, 0), z_dir=(0, 0, 1))) as fillet7_piece_13:
        with BuildLine():
            CenterArc((1.975607293000068, 1.7921671828435135), FILLET7_R, 174.65290393930684, 100.69419212138638)
            Line((0.18344011015655504, 1.9599074247020087), (0, 0))
            ThreePointArc((0, 0), (1.0716737674292829, -0.05004299849977933), (2.1433475348585658, 0))
        make_face()
    extrude(amount=12.858368837146413, mode=Mode.SUBTRACT)
    with BuildSketch(Plane(origin=(-8.131727983645344, 8.131727983645252, 1), x_dir=(0.76992435028036, 0.6381351697292397, 0), z_dir=(0, 0, 1))) as fillet7_piece_14:
        with BuildLine():
            CenterArc((1.9756072930000717, -1.7921671828435126), FILLET7_R, 84.65290393930685, 100.6941921213865)
            Line((0.18344011015655898, -1.959907424702013), (0, 0))
            ThreePointArc((0, 0), (1.071673767429283, 0.0500429984997777), (2.143347534858566, -1.9e-16))
        make_face()
    extrude(amount=12.858368837146417, mode=Mode.SUBTRACT)
    with BuildSketch(Plane(origin=(-4.94974746830586, 4.949747468305805, 1), x_dir=(-0.7071067811865517, 0.7071067811865435, 0), z_dir=(0, 0, 1))) as fillet7_piece_15:
        with BuildLine():
            CenterArc((1.6139421869432118, -1.7999999999999996), FILLET7_R, 90.00000000000001, 78.1971083096929)
            ThreePointArc((-0.148000533113354, -1.4318181818181808), (-0.03709844001056821, -0.719723464878517), (0, 0))
            Line((0, 0), (1.6139421869432116, 2e-17))
        make_face()
    extrude(amount=11.534855467358028, mode=Mode.SUBTRACT)
    with BuildSketch(Plane(origin=(2.39e-15, 7, 1), x_dir=(-0.9947002228556331, -0.10281763783978815, 0), z_dir=(0, 0, 1))) as fillet7_piece_16:
        with BuildLine():
            CenterArc((1.6245186778686564, -1.7904604011401402), FILLET7_R, 95.90144584515355, 78.19710830969288)
            Line((-0.1659417232714832, -1.6053886530285197), (0, 0))
            ThreePointArc((0, 0), (0.7197234648785187, -0.03709844001056797), (1.4394469297570374, -1e-17))
        make_face()
    extrude(amount=11.534855467358028, mode=Mode.SUBTRACT)

    # Sketch15 → Cut-Extrude7 (cut)
    with BuildSketch(Plane(origin=(0, 0, -2.5), x_dir=(-1, 0, 0), z_dir=(0, 0, -1))):
        Circle(SKETCH15_R)
    extrude(amount=-CUT_EXTRUDE7_DEPTH, mode=Mode.SUBTRACT)

    # Sketch17 → Boss-Extrude7 (add)
    with BuildSketch(Plane.XY.offset(1)):
        Circle(SKETCH17_R)
        Circle(SKETCH17_R_2, mode=Mode.SUBTRACT)
    extrude(amount=BOSS_EXTRUDE7_DEPTH)

    # Fillet8
    fillet8_edges = [part.edges().sort_by_distance(p)[0] for p in [
        (9.072734411136402, -2.64e-15, 8.5),
        (6.415392026018866, 6.415392026018946, 8.5),
        (6.467156727578926, 2.678784026555827, 8.5),
        (8.180339566895455, 7.259182095609021, 8.5),
        (5.573308738132088, 5.0032564751122734, 8.5),
        (7.478760983946551, 0.40308782081246686, 8.5),
        (10.917390465833716, 0.6513566944870959, 8.5),
        (2.64e-15, 9.072734411136402, 8.5),
        (-2.6787840265558276, 6.4671567275789235, 8.5),
        (-4.4008594721986185, 10.624614623879763, 8.5),
        (-6.415392026018942, 6.4153920260188695, 8.5),
        (-0.6513566944870959, 10.917390465833716, 8.5),
        (-5.0032564751122734, 5.573308738132088, 8.5),
        (-7.259182095609021, 8.180339566895455, 8.5),
        (-0.40308782081246686, 7.478760983946551, 8.5),
        (-9.072734411136402, -2.64e-15, 8.5),
        (-6.467156727578924, -2.678784026555827, 8.5),
        (-10.624614623879765, -4.400859472198617, 8.5),
        (-6.415392026018846, -6.415392026018966, 8.5),
        (-5.573308738132088, -5.0032564751122734, 8.5),
        (-8.180339566895455, -7.259182095609021, 8.5),
        (-10.917390465833716, -0.6513566944870959, 8.5),
        (-7.478760983946551, -0.40308782081246686, 8.5),
        (10.624614623879765, 4.400859472198618, 8.5),
        (4.4008594721986185, -10.624614623879761, 8.5),
        (2.64e-15, -9.072734411136402, 8.5),
        (2.678784026555829, -6.467156727578926, 8.5),
        (6.4153920260189485, -6.415392026018862, 8.5),
        (5.0032564751122734, -5.573308738132088, 8.5),
        (7.259182095609021, -8.180339566895455, 8.5),
        (0.6513566944870959, -10.917390465833716, 8.5),
        (0.40308782081246686, -7.478760983946551, 8.5),
    ]]
    fillet(fillet8_edges, radius=FILLET8_R)

    # Sketch21 → Cut-Extrude9 (cut)
    with BuildSketch(Plane.XY.offset(1)):
        with Locations((-2.2961005941905532, 5.543277195067715)):
            Circle(SKETCH21_R)
    cut_extrude9 = extrude(amount=CUT_EXTRUDE9_DEPTH, mode=Mode.SUBTRACT)

    # Sketch22 → Cut-Extrude10 (cut)
    with BuildSketch(Plane.XY.offset(1)):
        with Locations((-2.2961005941905532, 5.543277195067715)):
            Circle(SKETCH22_R)
    cut_extrude10 = extrude(amount=-CUT_EXTRUDE10_DEPTH, mode=Mode.SUBTRACT)

    # CirPattern5: Cut-Extrude9 ×4 about axis
    cirpattern5_axis = Axis((-9.65e-15, -3.9e-15, 0), (0, 0, 1))
    for i in range(1, CIRPATTERN5_COUNT):
        add(cut_extrude9.rotate(cirpattern5_axis, i * 360 / CIRPATTERN5_COUNT), mode=Mode.SUBTRACT)

    # CirPattern6: Cut-Extrude10 ×4 about axis
    cirpattern6_axis = Axis((-9.65e-15, -3.9e-15, 0), (0, 0, 1))
    for i in range(1, CIRPATTERN6_COUNT):
        add(cut_extrude10.rotate(cirpattern6_axis, i * 360 / CIRPATTERN6_COUNT), mode=Mode.SUBTRACT)


solid = part.part
